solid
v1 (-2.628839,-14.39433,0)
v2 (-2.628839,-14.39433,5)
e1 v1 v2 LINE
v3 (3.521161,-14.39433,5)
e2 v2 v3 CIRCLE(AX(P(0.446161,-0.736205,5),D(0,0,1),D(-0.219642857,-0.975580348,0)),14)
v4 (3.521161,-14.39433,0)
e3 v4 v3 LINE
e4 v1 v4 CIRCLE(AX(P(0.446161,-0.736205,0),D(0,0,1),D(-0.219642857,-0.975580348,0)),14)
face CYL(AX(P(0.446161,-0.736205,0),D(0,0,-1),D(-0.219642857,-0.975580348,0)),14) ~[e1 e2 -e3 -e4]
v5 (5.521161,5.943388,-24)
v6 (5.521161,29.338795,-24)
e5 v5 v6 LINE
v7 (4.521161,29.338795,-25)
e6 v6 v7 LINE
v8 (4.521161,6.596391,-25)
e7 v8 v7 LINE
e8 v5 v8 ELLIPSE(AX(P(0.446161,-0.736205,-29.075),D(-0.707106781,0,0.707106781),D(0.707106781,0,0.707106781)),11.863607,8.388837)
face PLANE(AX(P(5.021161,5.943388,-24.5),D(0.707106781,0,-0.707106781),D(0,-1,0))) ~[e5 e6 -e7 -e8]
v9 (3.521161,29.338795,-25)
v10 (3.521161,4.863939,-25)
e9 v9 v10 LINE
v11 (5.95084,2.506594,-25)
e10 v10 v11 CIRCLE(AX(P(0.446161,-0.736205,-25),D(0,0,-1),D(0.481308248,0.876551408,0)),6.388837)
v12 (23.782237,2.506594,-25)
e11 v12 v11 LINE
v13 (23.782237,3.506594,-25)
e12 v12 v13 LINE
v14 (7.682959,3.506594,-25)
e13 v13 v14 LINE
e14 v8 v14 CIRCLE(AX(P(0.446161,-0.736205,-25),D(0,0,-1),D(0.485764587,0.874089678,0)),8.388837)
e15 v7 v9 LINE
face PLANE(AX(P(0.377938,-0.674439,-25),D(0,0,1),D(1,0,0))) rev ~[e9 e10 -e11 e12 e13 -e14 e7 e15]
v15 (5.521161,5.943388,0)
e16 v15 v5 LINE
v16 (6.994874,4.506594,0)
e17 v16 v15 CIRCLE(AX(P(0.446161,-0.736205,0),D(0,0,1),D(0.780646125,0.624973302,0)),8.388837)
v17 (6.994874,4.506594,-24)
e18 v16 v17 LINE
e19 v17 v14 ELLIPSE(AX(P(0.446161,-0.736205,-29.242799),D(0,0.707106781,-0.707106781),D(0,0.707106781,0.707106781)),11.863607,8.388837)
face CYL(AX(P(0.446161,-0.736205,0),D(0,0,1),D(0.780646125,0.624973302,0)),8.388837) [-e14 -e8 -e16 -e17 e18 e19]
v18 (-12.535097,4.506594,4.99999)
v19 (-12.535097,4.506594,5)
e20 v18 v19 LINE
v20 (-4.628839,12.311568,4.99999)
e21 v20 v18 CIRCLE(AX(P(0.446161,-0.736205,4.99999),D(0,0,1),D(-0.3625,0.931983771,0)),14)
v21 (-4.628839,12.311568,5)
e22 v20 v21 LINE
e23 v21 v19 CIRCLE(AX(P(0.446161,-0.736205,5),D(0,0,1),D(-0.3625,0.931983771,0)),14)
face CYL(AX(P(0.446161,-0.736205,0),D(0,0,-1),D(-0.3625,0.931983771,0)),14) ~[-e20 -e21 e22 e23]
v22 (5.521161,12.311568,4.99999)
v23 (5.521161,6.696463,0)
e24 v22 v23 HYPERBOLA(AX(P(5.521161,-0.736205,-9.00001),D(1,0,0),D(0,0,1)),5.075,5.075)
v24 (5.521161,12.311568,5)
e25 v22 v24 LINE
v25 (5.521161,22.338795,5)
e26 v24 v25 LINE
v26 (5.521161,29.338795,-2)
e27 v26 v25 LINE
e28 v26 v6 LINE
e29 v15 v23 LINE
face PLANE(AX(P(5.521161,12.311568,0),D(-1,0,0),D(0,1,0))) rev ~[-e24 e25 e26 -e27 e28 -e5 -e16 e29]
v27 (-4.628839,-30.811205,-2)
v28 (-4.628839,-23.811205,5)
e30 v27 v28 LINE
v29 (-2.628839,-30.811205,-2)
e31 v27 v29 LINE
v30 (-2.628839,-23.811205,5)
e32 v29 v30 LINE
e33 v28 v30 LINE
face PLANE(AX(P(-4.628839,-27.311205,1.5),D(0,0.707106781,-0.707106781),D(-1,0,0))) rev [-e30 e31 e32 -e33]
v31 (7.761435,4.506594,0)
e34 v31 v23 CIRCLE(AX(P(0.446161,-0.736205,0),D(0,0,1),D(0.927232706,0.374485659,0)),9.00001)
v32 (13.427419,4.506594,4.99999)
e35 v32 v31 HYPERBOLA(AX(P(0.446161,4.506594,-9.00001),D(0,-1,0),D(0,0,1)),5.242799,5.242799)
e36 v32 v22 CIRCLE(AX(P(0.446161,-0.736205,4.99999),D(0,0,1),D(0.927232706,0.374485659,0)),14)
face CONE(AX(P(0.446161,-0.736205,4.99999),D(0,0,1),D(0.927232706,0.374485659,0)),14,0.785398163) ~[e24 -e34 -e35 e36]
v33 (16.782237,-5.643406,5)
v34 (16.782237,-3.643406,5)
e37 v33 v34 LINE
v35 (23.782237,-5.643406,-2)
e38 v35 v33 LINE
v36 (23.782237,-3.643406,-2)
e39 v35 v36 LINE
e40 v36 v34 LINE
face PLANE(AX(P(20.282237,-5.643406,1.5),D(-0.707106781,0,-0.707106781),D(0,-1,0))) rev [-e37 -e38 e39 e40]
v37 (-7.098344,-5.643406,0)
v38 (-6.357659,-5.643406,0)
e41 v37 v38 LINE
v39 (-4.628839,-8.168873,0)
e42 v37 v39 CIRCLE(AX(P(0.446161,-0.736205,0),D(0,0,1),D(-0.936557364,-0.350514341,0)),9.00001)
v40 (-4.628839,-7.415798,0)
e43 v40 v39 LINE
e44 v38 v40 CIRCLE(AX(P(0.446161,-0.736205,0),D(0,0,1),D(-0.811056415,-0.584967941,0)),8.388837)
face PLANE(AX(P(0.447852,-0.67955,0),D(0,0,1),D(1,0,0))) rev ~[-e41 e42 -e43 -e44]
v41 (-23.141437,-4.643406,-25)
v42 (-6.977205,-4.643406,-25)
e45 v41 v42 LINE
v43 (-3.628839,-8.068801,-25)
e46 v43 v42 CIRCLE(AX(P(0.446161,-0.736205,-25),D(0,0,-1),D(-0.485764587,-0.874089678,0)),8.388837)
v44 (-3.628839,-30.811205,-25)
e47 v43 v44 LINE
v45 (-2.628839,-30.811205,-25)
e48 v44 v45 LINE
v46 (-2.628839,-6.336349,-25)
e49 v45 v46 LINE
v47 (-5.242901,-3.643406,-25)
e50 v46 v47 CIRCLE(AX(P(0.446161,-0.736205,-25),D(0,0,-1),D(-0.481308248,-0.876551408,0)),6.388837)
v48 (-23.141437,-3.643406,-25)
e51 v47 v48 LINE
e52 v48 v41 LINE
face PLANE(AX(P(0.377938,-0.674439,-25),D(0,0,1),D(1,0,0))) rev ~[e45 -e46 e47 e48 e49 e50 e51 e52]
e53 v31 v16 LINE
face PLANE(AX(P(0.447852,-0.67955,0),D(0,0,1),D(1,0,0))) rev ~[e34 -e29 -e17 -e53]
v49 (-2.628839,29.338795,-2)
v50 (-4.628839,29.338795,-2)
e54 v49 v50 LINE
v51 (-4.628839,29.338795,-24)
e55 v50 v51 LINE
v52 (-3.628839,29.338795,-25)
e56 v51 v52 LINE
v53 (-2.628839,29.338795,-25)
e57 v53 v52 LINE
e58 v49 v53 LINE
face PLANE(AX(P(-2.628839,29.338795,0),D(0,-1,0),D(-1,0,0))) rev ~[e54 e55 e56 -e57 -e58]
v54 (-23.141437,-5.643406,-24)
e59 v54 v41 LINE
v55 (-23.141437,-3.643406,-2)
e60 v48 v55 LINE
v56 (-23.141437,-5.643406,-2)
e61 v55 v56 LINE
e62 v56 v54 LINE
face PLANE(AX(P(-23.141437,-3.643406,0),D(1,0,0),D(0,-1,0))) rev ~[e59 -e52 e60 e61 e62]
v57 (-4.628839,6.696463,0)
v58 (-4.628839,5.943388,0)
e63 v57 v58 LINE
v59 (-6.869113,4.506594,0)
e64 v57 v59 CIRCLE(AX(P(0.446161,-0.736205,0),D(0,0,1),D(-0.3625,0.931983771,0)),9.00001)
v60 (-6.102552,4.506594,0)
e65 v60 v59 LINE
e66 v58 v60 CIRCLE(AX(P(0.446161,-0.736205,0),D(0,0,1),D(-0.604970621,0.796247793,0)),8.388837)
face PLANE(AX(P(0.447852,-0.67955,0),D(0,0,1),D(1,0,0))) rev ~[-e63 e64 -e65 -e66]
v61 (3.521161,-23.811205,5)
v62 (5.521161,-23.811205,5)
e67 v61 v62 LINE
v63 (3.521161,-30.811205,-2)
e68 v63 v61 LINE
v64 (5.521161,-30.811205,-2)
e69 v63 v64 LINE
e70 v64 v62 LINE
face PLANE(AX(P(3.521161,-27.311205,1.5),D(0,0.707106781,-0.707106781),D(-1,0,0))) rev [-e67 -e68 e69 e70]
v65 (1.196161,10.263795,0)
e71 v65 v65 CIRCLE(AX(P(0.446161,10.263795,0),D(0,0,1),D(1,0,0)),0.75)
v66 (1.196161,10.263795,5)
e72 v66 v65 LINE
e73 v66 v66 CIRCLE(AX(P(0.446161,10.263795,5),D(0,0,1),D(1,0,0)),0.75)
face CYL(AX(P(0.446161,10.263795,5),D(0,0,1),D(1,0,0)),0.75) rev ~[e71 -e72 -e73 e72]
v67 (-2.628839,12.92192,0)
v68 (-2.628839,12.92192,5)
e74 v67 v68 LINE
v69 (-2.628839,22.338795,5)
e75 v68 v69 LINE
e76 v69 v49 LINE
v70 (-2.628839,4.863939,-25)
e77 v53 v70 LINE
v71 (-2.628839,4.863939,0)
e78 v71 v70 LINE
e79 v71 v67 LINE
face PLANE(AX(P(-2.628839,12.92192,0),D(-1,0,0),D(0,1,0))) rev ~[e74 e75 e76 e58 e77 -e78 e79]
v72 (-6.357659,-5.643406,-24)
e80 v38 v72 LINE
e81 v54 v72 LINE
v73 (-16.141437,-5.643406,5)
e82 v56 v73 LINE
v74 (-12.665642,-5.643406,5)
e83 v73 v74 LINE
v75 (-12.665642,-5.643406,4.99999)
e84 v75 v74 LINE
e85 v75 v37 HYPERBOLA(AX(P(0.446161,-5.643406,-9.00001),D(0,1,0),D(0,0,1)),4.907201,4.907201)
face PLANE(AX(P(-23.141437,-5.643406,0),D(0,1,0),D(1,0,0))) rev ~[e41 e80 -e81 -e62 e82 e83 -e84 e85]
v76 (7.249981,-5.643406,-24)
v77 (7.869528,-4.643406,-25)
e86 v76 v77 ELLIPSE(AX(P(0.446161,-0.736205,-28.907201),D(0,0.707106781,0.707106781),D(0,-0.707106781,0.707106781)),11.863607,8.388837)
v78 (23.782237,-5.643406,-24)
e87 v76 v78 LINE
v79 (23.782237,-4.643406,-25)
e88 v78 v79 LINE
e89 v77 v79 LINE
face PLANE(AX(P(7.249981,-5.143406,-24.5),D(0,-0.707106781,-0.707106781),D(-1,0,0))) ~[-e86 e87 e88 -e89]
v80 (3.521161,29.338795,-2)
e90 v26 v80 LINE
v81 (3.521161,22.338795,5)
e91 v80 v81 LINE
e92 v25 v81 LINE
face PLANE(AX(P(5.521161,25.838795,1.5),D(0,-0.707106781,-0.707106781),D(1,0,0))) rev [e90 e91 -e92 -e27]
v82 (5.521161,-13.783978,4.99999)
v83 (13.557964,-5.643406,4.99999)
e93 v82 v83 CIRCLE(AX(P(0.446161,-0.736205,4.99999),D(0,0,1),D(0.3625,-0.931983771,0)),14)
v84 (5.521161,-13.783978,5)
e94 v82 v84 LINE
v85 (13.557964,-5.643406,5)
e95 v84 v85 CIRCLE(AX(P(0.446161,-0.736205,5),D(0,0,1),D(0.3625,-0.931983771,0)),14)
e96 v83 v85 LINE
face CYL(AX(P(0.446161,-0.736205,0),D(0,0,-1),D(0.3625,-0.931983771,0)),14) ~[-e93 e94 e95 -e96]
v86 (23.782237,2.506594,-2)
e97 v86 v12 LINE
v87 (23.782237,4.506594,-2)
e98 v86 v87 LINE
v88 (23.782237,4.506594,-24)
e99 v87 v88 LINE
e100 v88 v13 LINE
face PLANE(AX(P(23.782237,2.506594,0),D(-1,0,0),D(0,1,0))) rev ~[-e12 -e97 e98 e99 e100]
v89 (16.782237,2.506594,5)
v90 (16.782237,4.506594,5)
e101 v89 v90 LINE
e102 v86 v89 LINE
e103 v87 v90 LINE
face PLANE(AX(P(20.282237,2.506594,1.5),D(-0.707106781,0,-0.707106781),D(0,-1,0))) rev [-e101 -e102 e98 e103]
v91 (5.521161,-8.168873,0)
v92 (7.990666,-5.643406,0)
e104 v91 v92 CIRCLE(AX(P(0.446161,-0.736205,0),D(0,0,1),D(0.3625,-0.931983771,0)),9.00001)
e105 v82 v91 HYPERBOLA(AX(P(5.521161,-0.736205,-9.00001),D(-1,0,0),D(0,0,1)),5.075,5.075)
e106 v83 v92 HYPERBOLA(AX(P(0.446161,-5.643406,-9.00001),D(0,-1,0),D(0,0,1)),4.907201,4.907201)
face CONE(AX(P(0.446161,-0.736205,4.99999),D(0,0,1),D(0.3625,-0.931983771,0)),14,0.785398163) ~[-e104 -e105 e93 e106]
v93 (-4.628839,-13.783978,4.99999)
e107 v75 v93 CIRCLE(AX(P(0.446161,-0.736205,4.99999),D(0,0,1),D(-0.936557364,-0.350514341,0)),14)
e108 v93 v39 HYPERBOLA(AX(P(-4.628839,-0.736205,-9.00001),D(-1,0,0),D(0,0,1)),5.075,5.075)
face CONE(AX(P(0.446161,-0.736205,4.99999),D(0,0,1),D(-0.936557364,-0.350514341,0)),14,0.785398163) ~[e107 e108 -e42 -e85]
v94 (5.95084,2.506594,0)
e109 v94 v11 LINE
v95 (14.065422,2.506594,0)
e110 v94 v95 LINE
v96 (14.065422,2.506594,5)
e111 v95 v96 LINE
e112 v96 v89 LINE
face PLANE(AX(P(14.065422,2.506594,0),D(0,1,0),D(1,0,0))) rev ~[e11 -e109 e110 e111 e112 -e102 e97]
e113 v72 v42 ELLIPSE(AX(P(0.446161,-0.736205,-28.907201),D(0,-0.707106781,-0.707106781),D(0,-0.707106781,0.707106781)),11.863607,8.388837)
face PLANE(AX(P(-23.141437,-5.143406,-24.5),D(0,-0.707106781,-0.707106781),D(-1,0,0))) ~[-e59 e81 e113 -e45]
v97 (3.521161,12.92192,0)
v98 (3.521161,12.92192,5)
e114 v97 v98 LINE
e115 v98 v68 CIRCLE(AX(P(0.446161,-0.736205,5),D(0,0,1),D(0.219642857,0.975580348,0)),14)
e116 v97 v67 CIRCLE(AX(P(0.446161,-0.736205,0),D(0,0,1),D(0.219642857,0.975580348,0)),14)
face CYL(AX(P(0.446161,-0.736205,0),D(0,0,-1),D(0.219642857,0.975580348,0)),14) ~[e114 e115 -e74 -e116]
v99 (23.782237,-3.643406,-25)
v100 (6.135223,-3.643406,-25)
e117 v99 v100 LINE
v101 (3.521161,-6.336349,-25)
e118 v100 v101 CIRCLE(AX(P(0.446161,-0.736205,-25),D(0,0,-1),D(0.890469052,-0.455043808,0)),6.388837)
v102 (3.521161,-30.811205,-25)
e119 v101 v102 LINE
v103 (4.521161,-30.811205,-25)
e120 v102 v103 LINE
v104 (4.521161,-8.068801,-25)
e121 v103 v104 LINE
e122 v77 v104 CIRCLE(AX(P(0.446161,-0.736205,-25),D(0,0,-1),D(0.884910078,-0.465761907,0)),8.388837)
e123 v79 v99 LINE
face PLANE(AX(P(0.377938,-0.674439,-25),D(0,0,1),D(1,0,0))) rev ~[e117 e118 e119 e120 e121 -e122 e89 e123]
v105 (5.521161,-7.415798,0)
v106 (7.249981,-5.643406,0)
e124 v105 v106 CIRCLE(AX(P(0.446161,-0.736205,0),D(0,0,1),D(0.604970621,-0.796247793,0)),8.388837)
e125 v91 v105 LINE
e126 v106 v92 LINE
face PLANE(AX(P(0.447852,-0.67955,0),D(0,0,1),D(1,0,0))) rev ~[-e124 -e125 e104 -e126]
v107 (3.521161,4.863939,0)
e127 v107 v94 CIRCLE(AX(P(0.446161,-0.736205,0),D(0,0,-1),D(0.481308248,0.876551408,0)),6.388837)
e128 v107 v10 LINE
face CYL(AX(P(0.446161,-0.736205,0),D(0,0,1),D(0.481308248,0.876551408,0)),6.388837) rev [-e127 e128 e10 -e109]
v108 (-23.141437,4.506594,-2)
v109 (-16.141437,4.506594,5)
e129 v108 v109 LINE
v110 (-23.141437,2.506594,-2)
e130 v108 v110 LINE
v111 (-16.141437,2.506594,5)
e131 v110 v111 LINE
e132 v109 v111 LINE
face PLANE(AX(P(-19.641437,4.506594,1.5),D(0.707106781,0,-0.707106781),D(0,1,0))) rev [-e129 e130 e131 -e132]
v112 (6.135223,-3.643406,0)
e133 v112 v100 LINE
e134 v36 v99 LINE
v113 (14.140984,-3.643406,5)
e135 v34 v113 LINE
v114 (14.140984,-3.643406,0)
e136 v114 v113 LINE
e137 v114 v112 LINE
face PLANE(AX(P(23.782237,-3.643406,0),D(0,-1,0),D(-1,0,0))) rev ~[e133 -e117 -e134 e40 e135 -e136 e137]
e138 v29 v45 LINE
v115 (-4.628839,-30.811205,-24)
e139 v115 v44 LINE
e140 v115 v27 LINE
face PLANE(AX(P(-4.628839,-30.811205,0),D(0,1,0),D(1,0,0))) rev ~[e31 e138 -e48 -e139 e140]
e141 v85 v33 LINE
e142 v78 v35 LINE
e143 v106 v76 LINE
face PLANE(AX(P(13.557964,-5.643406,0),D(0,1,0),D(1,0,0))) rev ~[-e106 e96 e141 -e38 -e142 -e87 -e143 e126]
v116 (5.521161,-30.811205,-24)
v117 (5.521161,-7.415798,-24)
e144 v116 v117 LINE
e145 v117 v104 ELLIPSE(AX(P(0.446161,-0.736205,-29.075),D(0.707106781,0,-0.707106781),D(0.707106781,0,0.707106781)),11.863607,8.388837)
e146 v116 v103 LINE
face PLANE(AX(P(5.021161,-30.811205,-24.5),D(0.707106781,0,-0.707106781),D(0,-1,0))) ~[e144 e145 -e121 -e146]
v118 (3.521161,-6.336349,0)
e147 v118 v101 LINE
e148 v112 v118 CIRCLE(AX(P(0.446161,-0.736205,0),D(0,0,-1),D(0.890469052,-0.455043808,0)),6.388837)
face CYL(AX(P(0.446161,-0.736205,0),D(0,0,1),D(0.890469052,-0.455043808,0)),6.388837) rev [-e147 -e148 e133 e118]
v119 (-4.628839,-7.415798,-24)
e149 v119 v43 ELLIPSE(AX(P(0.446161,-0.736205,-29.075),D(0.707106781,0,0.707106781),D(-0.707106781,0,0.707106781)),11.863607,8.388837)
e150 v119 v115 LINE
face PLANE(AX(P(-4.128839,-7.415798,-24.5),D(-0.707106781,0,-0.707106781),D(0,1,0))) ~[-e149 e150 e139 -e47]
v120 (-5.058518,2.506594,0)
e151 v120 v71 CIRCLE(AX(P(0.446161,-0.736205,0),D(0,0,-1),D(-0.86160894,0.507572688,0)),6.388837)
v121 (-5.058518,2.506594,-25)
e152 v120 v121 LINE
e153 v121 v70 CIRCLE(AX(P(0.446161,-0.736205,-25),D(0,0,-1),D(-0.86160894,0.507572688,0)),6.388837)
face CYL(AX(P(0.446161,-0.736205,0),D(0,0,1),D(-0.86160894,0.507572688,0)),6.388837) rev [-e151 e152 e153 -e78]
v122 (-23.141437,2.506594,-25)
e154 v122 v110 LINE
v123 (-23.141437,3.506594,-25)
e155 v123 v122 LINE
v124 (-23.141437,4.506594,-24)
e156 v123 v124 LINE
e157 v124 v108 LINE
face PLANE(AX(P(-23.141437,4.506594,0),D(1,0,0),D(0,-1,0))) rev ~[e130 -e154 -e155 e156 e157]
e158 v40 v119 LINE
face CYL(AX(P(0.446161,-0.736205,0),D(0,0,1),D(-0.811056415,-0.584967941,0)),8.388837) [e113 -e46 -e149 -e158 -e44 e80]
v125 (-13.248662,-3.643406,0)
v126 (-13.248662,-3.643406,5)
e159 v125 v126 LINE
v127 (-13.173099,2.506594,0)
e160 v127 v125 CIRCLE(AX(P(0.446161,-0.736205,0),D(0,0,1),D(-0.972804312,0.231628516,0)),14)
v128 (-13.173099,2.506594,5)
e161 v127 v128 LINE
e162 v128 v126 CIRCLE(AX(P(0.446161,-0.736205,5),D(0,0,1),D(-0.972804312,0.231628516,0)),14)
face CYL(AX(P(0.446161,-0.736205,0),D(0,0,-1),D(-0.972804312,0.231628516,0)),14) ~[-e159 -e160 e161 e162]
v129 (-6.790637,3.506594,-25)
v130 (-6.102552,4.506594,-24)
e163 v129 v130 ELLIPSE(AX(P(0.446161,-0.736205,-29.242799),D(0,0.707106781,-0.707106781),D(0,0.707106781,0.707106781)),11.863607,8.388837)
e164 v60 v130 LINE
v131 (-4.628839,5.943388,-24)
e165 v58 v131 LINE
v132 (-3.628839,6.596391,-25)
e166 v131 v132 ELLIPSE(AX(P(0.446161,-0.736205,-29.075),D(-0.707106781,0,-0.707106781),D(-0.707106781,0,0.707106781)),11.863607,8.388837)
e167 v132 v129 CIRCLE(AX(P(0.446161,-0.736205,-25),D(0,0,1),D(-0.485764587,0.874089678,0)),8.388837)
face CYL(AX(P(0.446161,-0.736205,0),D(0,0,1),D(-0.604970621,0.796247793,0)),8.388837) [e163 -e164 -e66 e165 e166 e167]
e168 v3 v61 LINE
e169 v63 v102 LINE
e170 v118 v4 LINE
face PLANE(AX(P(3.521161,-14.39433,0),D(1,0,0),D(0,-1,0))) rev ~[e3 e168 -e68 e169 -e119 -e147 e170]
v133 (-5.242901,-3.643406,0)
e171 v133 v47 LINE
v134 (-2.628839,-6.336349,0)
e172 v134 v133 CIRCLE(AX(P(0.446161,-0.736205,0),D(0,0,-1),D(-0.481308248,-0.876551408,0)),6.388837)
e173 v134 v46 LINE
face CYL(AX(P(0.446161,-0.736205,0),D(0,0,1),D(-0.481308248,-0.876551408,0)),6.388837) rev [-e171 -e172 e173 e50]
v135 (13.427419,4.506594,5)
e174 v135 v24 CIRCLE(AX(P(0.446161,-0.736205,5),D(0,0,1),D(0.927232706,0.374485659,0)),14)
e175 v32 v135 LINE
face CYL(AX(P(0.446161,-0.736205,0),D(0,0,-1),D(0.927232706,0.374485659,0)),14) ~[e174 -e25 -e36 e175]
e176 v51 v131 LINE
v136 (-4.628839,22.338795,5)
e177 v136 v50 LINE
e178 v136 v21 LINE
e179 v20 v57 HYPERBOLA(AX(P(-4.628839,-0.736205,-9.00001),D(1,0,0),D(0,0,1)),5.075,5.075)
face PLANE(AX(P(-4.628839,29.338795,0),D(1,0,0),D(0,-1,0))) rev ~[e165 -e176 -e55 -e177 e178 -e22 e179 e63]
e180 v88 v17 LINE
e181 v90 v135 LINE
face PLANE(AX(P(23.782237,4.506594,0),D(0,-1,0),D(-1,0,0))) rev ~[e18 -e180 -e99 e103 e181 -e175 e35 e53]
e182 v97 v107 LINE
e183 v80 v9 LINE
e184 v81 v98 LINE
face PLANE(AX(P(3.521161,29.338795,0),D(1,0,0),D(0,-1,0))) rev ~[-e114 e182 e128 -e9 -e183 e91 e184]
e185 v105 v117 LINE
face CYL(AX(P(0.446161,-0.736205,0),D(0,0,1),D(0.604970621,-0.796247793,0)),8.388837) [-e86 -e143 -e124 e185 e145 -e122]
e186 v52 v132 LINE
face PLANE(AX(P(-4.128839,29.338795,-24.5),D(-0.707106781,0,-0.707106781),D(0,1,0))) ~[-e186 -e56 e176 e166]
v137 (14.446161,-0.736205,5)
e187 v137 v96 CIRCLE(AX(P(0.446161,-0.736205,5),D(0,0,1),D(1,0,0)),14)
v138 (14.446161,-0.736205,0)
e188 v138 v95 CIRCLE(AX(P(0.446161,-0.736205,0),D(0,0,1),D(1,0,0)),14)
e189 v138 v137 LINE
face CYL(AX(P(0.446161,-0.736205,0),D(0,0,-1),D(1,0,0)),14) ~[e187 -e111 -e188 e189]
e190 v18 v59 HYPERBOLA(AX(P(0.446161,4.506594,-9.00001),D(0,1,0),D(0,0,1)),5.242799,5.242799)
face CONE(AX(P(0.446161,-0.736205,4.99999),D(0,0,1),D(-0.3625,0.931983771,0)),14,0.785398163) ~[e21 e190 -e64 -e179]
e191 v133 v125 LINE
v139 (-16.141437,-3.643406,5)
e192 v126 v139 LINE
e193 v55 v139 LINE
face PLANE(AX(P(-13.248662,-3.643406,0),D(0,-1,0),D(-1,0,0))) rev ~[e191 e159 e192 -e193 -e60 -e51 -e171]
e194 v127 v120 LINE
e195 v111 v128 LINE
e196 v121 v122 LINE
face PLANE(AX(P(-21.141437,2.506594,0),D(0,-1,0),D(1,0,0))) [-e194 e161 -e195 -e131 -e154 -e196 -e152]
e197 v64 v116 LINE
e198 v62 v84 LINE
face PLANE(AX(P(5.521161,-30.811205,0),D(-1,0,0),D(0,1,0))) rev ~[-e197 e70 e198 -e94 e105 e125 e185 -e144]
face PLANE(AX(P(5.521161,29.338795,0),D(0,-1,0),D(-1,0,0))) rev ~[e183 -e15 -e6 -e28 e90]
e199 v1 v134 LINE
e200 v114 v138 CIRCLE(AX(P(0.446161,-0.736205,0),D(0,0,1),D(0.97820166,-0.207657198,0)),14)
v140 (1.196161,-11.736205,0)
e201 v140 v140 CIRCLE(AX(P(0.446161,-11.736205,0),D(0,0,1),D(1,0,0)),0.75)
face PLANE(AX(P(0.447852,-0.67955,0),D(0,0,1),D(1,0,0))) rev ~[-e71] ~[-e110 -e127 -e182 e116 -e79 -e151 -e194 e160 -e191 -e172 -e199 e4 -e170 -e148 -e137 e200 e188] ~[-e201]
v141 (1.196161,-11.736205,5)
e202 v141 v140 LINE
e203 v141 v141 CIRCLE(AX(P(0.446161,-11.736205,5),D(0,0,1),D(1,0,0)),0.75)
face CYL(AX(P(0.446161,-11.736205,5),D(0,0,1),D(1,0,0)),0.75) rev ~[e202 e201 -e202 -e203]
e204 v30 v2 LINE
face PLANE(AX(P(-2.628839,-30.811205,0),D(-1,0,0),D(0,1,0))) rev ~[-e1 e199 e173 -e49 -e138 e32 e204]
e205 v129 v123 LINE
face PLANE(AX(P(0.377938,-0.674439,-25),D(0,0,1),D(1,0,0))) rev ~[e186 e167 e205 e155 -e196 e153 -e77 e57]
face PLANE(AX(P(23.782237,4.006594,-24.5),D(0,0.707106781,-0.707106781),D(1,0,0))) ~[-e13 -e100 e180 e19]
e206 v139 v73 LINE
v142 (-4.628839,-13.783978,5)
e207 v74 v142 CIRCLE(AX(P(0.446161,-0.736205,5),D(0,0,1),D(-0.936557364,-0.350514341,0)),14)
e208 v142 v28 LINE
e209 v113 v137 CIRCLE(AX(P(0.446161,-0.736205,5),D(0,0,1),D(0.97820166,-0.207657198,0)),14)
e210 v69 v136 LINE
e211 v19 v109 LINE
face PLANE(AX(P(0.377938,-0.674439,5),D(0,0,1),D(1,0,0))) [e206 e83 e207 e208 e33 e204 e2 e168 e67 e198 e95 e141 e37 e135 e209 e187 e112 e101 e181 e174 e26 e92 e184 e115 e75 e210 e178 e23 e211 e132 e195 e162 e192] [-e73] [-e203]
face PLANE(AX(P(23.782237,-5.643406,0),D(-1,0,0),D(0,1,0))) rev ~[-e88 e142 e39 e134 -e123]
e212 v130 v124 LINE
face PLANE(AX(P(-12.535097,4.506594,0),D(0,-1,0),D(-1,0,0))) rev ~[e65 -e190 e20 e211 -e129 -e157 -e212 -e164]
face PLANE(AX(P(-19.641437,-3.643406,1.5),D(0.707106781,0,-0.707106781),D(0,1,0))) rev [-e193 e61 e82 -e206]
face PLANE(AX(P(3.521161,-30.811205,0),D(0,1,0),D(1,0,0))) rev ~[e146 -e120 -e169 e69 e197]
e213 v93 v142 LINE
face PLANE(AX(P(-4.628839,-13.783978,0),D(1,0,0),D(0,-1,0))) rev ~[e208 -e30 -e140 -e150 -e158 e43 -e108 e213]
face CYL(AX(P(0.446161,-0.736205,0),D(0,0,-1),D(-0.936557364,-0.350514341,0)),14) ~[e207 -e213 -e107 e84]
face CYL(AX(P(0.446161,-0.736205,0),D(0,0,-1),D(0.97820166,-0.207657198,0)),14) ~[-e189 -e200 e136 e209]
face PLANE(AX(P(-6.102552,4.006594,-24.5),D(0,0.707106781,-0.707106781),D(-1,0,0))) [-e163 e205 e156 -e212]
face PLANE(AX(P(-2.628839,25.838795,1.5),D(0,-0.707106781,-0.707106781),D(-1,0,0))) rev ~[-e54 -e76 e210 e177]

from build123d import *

# Parameters (mm, degrees)
F1_DEPTH = 25
F2_W     = 6.15
F2_H     = 2
F2_W_2   = 2
F2_H_2   = 6.15
F3_DEPTH = 25
F5_DEPTH = 5
F6_R     = 0.75
F7_DEPTH = 5
F8_DEPTH = 5
F9_SIZE  = 7
F10_SIZE = 4.99999
F11_SIZE = 1


# Not quite as in the source:
# - a fillet or chamfer is up to 0.001 mm smaller than in the source, because OpenCascade refuses the exact size


with BuildPart() as f1:
    # F0 (on Top) → F1 (new body)
    with BuildSketch(Plane.XY):
        with BuildLine():
            Line((5.5211611295, 29.3387952344), (-4.6288388705, 29.3387952344))
            Line((-4.6288388705, 29.3387952344), (-4.6288388705, 5.9433882713))
            ThreePointArc((-4.6288388705, 5.9433882713), (-5.4099272548, 5.2703597245), (-6.1025520558, 4.5065944634))
            Line((-6.1025520558, 4.5065944634), (-23.141437278, 4.5065944634))
            Line((-23.141437278, 4.5065944634), (-23.141437278, -5.6434055366))
            Line((-23.141437278, -5.6434055366), (-6.3576590277, -5.6434055366))
            ThreePointArc((-6.3576590277, -5.6434055366), (-5.5589979581, -6.5937343191), (-4.6288388705, -7.4157978024))
            Line((-4.6288388705, -7.4157978024), (-4.6288388705, -30.8112047656))
            Line((-4.6288388705, -30.8112047656), (5.5211611295, -30.8112047656))
            Line((5.5211611295, -30.8112047656), (5.5211611295, -7.4157978024))
            ThreePointArc((5.5211611295, -7.4157978024), (6.4513202171, -6.5937343191), (7.2499812866, -5.6434055366))
            Line((7.2499812866, -5.6434055366), (23.7822366705, -5.6434055366))
            Line((23.7822366705, -5.6434055366), (23.7822366705, 4.5065944634))
            Line((23.7822366705, 4.5065944634), (6.9948743147, 4.5065944634))
            ThreePointArc((6.9948743147, 4.5065944634), (6.3022495138, 5.2703597245), (5.5211611295, 5.9433882713))
            Line((5.5211611295, 5.9433882713), (5.5211611295, 29.3387952344))
        make_face()
        with BuildLine():
            Line((-2.6288388705, 4.8639394003), (-2.6288388705, 27.3387952344))
            Line((-2.6288388705, 27.3387952344), (3.5211611295, 27.3387952344))
            Line((3.5211611295, 27.3387952344), (3.5211611295, 4.8639394003))
            ThreePointArc((3.5211611295, 4.8639394003), (4.8949803528, 3.8491247969), (5.9508403063, 2.5065944634))
            Line((5.9508403063, 2.5065944634), (21.7822366705, 2.5065944634))
            Line((21.7822366705, 2.5065944634), (21.7822366705, -3.6434055366))
            Line((21.7822366705, -3.6434055366), (6.1352228584, -3.6434055366))
            ThreePointArc((6.1352228584, -3.6434055366), (5.0303928567, -5.1861552316), (3.5211611295, -6.3363489315))
            Line((3.5211611295, -6.3363489315), (3.5211611295, -28.8112047656))
            Line((3.5211611295, -28.8112047656), (-2.6288388705, -28.8112047656))
            Line((-2.6288388705, -28.8112047656), (-2.6288388705, -6.3363489315))
            ThreePointArc((-2.6288388705, -6.3363489315), (-4.1380705978, -5.1861552316), (-5.2429005995, -3.6434055366))
            Line((-5.2429005995, -3.6434055366), (-21.141437278, -3.6434055366))
            Line((-21.141437278, -3.6434055366), (-21.141437278, 2.5065944634))
            Line((-21.141437278, 2.5065944634), (-5.0585180473, 2.5065944634))
            ThreePointArc((-5.0585180473, 2.5065944634), (-4.0026580939, 3.8491247969), (-2.6288388705, 4.8639394003))
        make_face(mode=Mode.SUBTRACT)
    extrude(amount=-F1_DEPTH)

    # F2 (on face) → F3 (cut, through all)
    with BuildSketch(Plane.XY):
        with Locations((0.4461611295, 28.3387952344)):
            Rectangle(F2_W, F2_H)
        with Locations((-22.141437278, -0.5684055366)):
            Rectangle(F2_W_2, F2_H_2)
        with Locations((22.7822366705, -0.5684055366)):
            Rectangle(F2_W_2, F2_H_2)
        with Locations((0.4461611295, -29.8112047656)):
            Rectangle(F2_W, F2_H)
    extrude(amount=-F3_DEPTH, mode=Mode.SUBTRACT)

    # F4 (on Top) → F5 (join)
    with BuildSketch(Plane.XY):
        with BuildLine():
            Line((3.5211611295, 4.8639394003), (3.5211611295, 12.9219201057))
            ThreePointArc((3.5211611295, 12.9219201057), (0.4461611295, 13.2637952344), (-2.6288388705, 12.9219201057))
            Line((-2.6288388705, 12.9219201057), (-2.6288388705, 4.8639394003))
            ThreePointArc((-2.6288388705, 4.8639394003), (-4.0026580939, 3.8491247969), (-5.0585180473, 2.5065944634))
            Line((-5.0585180473, 2.5065944634), (-13.1730992455, 2.5065944634))
            ThreePointArc((-13.1730992455, 2.5065944634), (-13.5527822586, -0.5642047132), (-13.2486621142, -3.6434055366))
            Line((-13.2486621142, -3.6434055366), (-5.2429005995, -3.6434055366))
            ThreePointArc((-5.2429005995, -3.6434055366), (-4.1380705978, -5.1861552316), (-2.6288388705, -6.3363489315))
            Line((-2.6288388705, -6.3363489315), (-2.6288388705, -14.3943296369))
            ThreePointArc((-2.6288388705, -14.3943296369), (0.4461611295, -14.7362047656), (3.5211611295, -14.3943296369))
            Line((3.5211611295, -14.3943296369), (3.5211611295, -6.3363489315))
            ThreePointArc((3.5211611295, -6.3363489315), (5.0303928567, -5.1861552316), (6.1352228584, -3.6434055366))
            Line((6.1352228584, -3.6434055366), (14.1409843732, -3.6434055366))
            ThreePointArc((14.1409843732, -3.6434055366), (14.3696579139, -2.1977920171), (14.4461611295, -0.7362047656))
            ThreePointArc((14.4461611295, -0.7362047656), (14.350650427, 0.8963323321), (14.0654215044, 2.5065944634))
            Line((14.0654215044, 2.5065944634), (5.9508403063, 2.5065944634))
            ThreePointArc((5.9508403063, 2.5065944634), (4.8949803528, 3.8491247969), (3.5211611295, 4.8639394003))
        make_face()
        with BuildLine():
            ThreePointArc((13.5579642318, -5.6434055366), (13.8867267431, -4.6542649982), (14.1409843732, -3.6434055366))
            Line((14.1409843732, -3.6434055366), (6.1352228584, -3.6434055366))
            ThreePointArc((6.1352228584, -3.6434055366), (5.0303928567, -5.1861552316), (3.5211611295, -6.3363489315))
            Line((3.5211611295, -6.3363489315), (3.5211611295, -14.3943296369))
            ThreePointArc((3.5211611295, -14.3943296369), (4.5325724418, -14.1265461573), (5.5211611295, -13.783977564))
            Line((5.5211611295, -13.783977564), (5.5211611295, -7.4157978024))
            ThreePointArc((5.5211611295, -7.4157978024), (6.4513202171, -6.5937343191), (7.2499812866, -5.6434055366))
            Line((7.2499812866, -5.6434055366), (13.5579642318, -5.6434055366))
        make_face()
        with BuildLine():
            Line((-4.6288388705, 5.9433882713), (-4.6288388705, 12.3115680329))
            ThreePointArc((-4.6288388705, 12.3115680329), (-9.3893111671, 9.2269014119), (-12.5350967543, 4.5065944634))
            Line((-12.5350967543, 4.5065944634), (-6.1025520558, 4.5065944634))
            ThreePointArc((-6.1025520558, 4.5065944634), (-5.4099272548, 5.2703597245), (-4.6288388705, 5.9433882713))
        make_face()
        with BuildLine():
            Line((-2.6288388705, 4.8639394003), (-2.6288388705, 12.9219201057))
            ThreePointArc((-2.6288388705, 12.9219201057), (-3.6402501828, 12.6541366261), (-4.6288388705, 12.3115680329))
            Line((-4.6288388705, 12.3115680329), (-4.6288388705, 5.9433882713))
            ThreePointArc((-4.6288388705, 5.9433882713), (-5.4099272548, 5.2703597245), (-6.1025520558, 4.5065944634))
            Line((-6.1025520558, 4.5065944634), (-12.5350967543, 4.5065944634))
            ThreePointArc((-12.5350967543, 4.5065944634), (-12.8916382733, 3.5185698574), (-13.1730992455, 2.5065944634))
            Line((-13.1730992455, 2.5065944634), (-5.0585180473, 2.5065944634))
            ThreePointArc((-5.0585180473, 2.5065944634), (-4.0026580939, 3.8491247969), (-2.6288388705, 4.8639394003))
        make_face()
        with BuildLine():
            ThreePointArc((13.4274190132, 4.5065944634), (10.281633426, 9.2269014119), (5.5211611295, 12.3115680329))
            Line((5.5211611295, 12.3115680329), (5.5211611295, 5.9433882713))
            ThreePointArc((5.5211611295, 5.9433882713), (6.3022495138, 5.2703597245), (6.9948743147, 4.5065944634))
            Line((6.9948743147, 4.5065944634), (13.4274190132, 4.5065944634))
        make_face()
        with BuildLine():
            Line((5.5211611295, 5.9433882713), (5.5211611295, 12.3115680329))
            ThreePointArc((5.5211611295, 12.3115680329), (4.5325724418, 12.6541366261), (3.5211611295, 12.9219201057))
            Line((3.5211611295, 12.9219201057), (3.5211611295, 4.8639394003))
            ThreePointArc((3.5211611295, 4.8639394003), (4.8949803528, 3.8491247969), (5.9508403063, 2.5065944634))
            Line((5.9508403063, 2.5065944634), (14.0654215044, 2.5065944634))
            ThreePointArc((14.0654215044, 2.5065944634), (13.7839605322, 3.5185698574), (13.4274190132, 4.5065944634))
            Line((13.4274190132, 4.5065944634), (6.9948743147, 4.5065944634))
            ThreePointArc((6.9948743147, 4.5065944634), (6.3022495138, 5.2703597245), (5.5211611295, 5.9433882713))
        make_face()
        with BuildLine():
            ThreePointArc((5.5211611295, -13.783977564), (10.4089508996, -10.5719975652), (13.5579642318, -5.6434055366))
            Line((13.5579642318, -5.6434055366), (7.2499812866, -5.6434055366))
            ThreePointArc((7.2499812866, -5.6434055366), (6.4513202171, -6.5937343191), (5.5211611295, -7.4157978024))
            Line((5.5211611295, -7.4157978024), (5.5211611295, -13.783977564))
        make_face()
        with BuildLine():
            Line((-6.3576590277, -5.6434055366), (-12.6656419728, -5.6434055366))
            ThreePointArc((-12.6656419728, -5.6434055366), (-9.5166286406, -10.5719975652), (-4.6288388705, -13.783977564))
            Line((-4.6288388705, -13.783977564), (-4.6288388705, -7.4157978024))
            ThreePointArc((-4.6288388705, -7.4157978024), (-5.5589979581, -6.5937343191), (-6.3576590277, -5.6434055366))
        make_face()
        with BuildLine():
            Line((-5.2429005995, -3.6434055366), (-13.2486621142, -3.6434055366))
            ThreePointArc((-13.2486621142, -3.6434055366), (-12.9944044841, -4.6542649982), (-12.6656419728, -5.6434055366))
            Line((-12.6656419728, -5.6434055366), (-6.3576590277, -5.6434055366))
            ThreePointArc((-6.3576590277, -5.6434055366), (-5.5589979581, -6.5937343191), (-4.6288388705, -7.4157978024))
            Line((-4.6288388705, -7.4157978024), (-4.6288388705, -13.783977564))
            ThreePointArc((-4.6288388705, -13.783977564), (-3.6402501828, -14.1265461573), (-2.6288388705, -14.3943296369))
            Line((-2.6288388705, -14.3943296369), (-2.6288388705, -6.3363489315))
            ThreePointArc((-2.6288388705, -6.3363489315), (-4.1380705978, -5.1861552316), (-5.2429005995, -3.6434055366))
        make_face()
    extrude(amount=F5_DEPTH)

    # F6 (on face) → F7 (cut, through all)
    with BuildSketch(Plane.XY.offset(5)):
        with Locations((0.4461611295, 10.2637952344)):
            Circle(F6_R)
        with Locations((0.4461611295, -11.7362047656)):
            Circle(F6_R)
    extrude(amount=-F7_DEPTH, mode=Mode.SUBTRACT)

    # F8 (add): faces of the model
    f8_faces = [f1.faces().sort_by_distance(p)[0] for p in [
        (-3.6349246548, 20.9904665399, 0),
        (4.5272469138, 20.9904665399, 0),
        (18.7764211463, 3.5172058862, 0),
        (18.8278982695, -4.6532031137, 0),
        (-18.0099019482, 3.5169457421, 0),
        (-18.0613729447, -4.6529604993, 0),
        (-3.6349246548, -22.4628760711, 0),
        (4.5272469138, -22.4628760711, 0),
    ]]
    extrude(f8_faces, amount=F8_DEPTH)

    # F9
    f9_edges = [f1.edges().sort_by_distance(p)[0] for p in [
        (-23.141437, 3.506594, 5),
        (-23.141437, -4.643406, 5),
        (-3.628839, -30.811205, 5),
        (4.521161, -30.811205, 5),
        (23.782237, -4.643406, 5),
        (23.782237, 3.506594, 5),
        (-3.628839, 29.338795, 5),
        (4.521161, 29.338795, 5),
    ]]
    chamfer(f9_edges, length=F9_SIZE)

    # F10 (size 5 in the source; OpenCascade refuses exactly that, so slightly less here)
    f10_edges = [f1.edges().sort_by_distance(p)[0] for p in [
        (10.281633, 9.226901, 0),
        (-9.389311, 9.226901, 0),
        (10.408951, -10.571998, 0),
        (-9.516629, -10.571998, 0),
    ]]
    chamfer(f10_edges, length=F10_SIZE)

    # F11
    f11_edges = [f1.edges().sort_by_distance(p)[0] for p in [
        (15.388555, 4.506594, -25),
        (5.521161, 17.641092, -25),
        (-4.628839, 17.641092, -25),
        (-14.621995, 4.506594, -25),
        (-14.749548, -5.643406, -25),
        (-4.628839, -19.113501, -25),
        (5.521161, -19.113501, -25),
        (15.516109, -5.643406, -25),
    ]]
    chamfer(f11_edges, length=F11_SIZE)


solid = f1.part
